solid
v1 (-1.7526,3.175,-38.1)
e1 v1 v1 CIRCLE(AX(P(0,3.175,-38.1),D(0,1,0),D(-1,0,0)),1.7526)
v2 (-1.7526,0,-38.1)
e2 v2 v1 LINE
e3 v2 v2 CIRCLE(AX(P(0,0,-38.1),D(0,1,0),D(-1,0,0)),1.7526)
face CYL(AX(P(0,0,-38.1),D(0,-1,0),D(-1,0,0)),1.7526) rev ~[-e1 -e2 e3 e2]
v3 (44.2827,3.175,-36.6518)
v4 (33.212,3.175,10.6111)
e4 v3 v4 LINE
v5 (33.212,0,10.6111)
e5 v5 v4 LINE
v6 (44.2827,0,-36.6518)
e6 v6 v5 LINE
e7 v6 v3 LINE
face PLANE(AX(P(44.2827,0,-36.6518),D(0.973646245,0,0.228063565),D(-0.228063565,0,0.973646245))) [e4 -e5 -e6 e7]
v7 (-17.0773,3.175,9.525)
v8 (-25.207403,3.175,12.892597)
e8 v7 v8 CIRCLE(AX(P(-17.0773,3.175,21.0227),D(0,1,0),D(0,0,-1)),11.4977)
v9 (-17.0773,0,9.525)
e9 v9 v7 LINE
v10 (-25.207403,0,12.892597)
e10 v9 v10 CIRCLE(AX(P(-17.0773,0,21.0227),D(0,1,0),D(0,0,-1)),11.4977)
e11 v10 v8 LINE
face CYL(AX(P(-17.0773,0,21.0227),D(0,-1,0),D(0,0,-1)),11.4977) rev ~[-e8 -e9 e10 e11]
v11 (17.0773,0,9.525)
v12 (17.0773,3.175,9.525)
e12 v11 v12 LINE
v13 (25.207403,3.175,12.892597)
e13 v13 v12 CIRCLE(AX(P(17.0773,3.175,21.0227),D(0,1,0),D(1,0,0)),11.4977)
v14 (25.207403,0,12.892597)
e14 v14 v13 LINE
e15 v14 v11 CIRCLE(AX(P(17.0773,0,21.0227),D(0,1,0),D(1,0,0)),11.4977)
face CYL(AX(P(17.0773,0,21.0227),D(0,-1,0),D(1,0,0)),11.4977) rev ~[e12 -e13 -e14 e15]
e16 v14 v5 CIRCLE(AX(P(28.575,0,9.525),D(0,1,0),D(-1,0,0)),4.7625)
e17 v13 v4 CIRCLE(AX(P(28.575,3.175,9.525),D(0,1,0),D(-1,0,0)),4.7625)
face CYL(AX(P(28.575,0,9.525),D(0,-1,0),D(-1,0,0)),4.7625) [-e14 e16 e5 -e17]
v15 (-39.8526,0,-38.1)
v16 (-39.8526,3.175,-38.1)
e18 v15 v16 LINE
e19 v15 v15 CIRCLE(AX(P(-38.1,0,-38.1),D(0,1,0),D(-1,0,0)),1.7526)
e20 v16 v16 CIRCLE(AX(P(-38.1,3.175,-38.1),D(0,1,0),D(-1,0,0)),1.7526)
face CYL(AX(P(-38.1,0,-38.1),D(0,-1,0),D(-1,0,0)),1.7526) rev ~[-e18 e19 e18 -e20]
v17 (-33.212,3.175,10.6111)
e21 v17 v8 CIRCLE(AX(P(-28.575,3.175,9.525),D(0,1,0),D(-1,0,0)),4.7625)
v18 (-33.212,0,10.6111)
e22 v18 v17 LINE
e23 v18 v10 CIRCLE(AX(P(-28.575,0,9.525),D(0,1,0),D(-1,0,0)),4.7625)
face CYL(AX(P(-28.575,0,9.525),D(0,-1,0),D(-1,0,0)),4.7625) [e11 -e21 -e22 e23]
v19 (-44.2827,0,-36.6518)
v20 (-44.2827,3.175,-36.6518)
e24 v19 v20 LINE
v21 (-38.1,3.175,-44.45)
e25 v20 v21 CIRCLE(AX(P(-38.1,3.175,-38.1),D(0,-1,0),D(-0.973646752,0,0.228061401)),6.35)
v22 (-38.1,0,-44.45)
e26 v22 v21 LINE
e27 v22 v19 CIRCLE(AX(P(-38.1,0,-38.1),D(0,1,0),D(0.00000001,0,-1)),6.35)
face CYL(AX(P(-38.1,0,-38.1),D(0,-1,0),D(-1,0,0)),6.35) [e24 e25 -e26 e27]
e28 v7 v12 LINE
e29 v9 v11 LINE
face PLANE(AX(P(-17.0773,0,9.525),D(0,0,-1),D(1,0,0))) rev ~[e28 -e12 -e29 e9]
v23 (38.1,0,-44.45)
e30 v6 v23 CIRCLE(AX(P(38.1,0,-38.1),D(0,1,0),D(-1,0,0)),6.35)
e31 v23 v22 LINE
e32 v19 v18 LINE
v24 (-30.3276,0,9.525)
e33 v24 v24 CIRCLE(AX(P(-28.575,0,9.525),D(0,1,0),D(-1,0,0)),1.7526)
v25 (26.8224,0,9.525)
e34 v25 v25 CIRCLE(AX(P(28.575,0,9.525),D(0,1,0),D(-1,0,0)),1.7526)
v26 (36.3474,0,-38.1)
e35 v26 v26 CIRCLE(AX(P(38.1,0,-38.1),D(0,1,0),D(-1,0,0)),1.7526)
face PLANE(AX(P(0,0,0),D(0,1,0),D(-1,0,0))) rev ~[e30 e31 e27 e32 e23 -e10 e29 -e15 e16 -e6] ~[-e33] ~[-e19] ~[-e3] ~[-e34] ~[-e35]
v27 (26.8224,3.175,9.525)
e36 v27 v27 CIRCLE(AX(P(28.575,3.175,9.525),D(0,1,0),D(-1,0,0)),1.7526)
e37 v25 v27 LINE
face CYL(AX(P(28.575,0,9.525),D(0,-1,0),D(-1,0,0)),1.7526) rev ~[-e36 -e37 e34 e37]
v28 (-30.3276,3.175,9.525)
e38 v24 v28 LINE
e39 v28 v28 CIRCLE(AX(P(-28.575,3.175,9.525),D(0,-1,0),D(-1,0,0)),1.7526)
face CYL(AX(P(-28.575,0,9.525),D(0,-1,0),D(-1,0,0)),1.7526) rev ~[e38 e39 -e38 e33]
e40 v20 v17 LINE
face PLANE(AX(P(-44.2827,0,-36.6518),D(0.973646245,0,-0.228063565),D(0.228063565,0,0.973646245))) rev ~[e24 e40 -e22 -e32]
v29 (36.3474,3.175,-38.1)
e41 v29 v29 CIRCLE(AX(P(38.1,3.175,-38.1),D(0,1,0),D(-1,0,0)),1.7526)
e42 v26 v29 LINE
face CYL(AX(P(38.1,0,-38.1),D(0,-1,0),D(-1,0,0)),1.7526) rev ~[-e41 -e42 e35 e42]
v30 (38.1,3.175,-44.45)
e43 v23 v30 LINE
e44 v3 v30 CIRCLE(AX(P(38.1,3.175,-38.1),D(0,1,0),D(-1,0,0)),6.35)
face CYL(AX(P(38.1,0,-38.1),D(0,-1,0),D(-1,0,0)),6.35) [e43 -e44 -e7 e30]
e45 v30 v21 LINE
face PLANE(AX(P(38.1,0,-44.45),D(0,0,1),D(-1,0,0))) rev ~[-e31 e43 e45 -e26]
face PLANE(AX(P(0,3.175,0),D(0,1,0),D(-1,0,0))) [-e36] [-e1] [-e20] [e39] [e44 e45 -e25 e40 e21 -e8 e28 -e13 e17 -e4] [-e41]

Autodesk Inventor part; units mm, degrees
ref_plane "YZ Plane" through (0, 0, 0) normal (1, 0, 0) x (0, 1, 0)
ref_plane "XZ Plane" through (0, 0, 0) normal (0, 1, 0) x (-1, 0, 0)
ref_plane "XY Plane" through (0, 0, 0) normal (0, 0, 1) x (1, 0, 0)
sketch "Sketch1" plane through (0, 0, 0) normal (0, 1, 0) x (-1, 0, 0)
  line L0 (101.6, 38.1) -> (-101.6, 38.1) construction
  line L1 (-101.6, 38.1) -> (-101.6, -38.1) construction
  line L2 (-101.6, -38.1) -> (101.6, -38.1) construction
  line L3 (101.6, -38.1) -> (101.6, 38.1) construction
  line L4 (101.6, 38.1) -> (-101.6, -38.1) construction
  line L5 (-101.6, 38.1) -> (101.6, -38.1) construction
  line L6 (-28.575, 66.675) -> (28.575, 66.675) construction
  line L7 (28.575, 66.675) -> (28.575, 9.525) construction
  line L8 (28.575, 9.525) -> (-28.575, 9.525)
  line L9 (-28.575, 9.525) -> (-28.575, 66.675) construction
  line L10 (-28.575, 66.675) -> (28.575, 9.525) construction
  line L11 (28.575, 66.675) -> (-28.575, 9.525) construction
  circle A0 centre (-38.1, 50.8) radius 3.175 construction
  line L12 (0, 38.1) -> (0, -38.1) construction
  circle A1 centre (-38.1, 50.8) radius 9.525 construction
  line L13 (-38.1, 60.325) -> (-28.575, 60.325) construction
  circle A2 centre (38.1, 50.8) radius 3.175 construction
  circle A3 centre (38.1, 50.8) radius 9.525 construction
  line L14 (38.1, 60.325) -> (28.575, 60.325) construction
  circle A4 centre (-76.2, -38.1) radius 1.7526 construction
  circle A5 centre (-95.25, 3.175) radius 1.7526 construction
  circle A6 centre (76.2, -38.1) radius 1.7526 construction
  circle A7 centre (95.25, 3.175) radius 1.7526 construction
  line L15 (-101.6, -38.1) -> (-101.6, 6.35) construction
  line L16 (-101.6, 6.35) -> (-44.4797, 57.8728) construction
  line L17 (101.6, -38.1) -> (101.6, 6.35) construction
  line L18 (101.6, 6.35) -> (44.4797, 57.8728) construction
  line L19 (-42.6417, 42.4275) -> (-87.975, 1.5367) construction
  line L20 (-87.975, 1.5367) -> (-87.975, -38.1) construction
  line L21 (87.975, -38.1) -> (87.975, 1.5367) construction
  line L22 (87.975, 1.5367) -> (42.6417, 42.4275) construction
  line L23 (0, -38.1) -> (-95.25, -38.1) construction
  line L24 (0, -38.1) -> (95.25, -38.1) construction
  circle A8 centre (-60.325, 35.0287) radius 1.7526 construction
  circle A9 centre (-33.3375, 31.75) radius 1.7526 construction
  line L25 (-38.1, 0) -> (-38.1, 41.275) construction
  line L26 (-38.1, 0) -> (0, 0) construction
  circle A10 centre (60.325, 35.0287) radius 1.7526 construction
  circle A11 centre (33.3375, 31.75) radius 1.7526 construction
  line L27 (38.1, 0) -> (38.1, 41.275) construction
  line L28 (38.1, 0) -> (0, 0) construction
  line L29 (-87.975, 0) -> (-65.115, 0) construction
  line L30 (-65.115, 0) -> (-65.115, -31.75) construction
  line L31 (-65.115, -31.75) -> (-87.975, -31.75) construction
  line L32 (-101.6, -38.1) -> (101.6, -38.1) construction
  line L33 (101.6, -38.1) -> (101.6, 19.05) construction
  line L34 (101.6, 19.05) -> (-101.6, 19.05) construction
  line L35 (-101.6, 19.05) -> (-101.6, -38.1) construction
  line L36 (-101.6, 19.05) -> (-87.5203, 19.05) construction
  line L37 (87.5203, 19.05) -> (101.6, 19.05) construction
  circle A12 centre (-38.1, 0) radius 3.175 construction
  circle A13 centre (-38.1, 0) radius 6.35 construction
  circle A14 centre (38.1, 0) radius 3.175 construction
  circle A15 centre (38.1, 0) radius 6.35 construction
  circle A16 centre (28.575, 9.525) radius 1.7526
  circle A17 centre (28.575, 9.525) radius 4.7625
  arc A18 (17.0773, 9.525) -> (28.575, 21.0227) centre (17.0773, 21.0227) ccw
  circle A19 centre (-28.575, 9.525) radius 1.7526
  circle A20 centre (-28.575, 9.525) radius 4.7625
  arc A21 (-28.575, 21.0227) -> (-17.0773, 9.525) centre (-17.0773, 21.0227) ccw
  arc A22 (31.4325, 5.715) -> (38.1, 19.05) centre (21.4312, 19.05) ccw construction
  arc A23 (-38.1, 19.05) -> (-31.4325, 5.715) centre (-21.4312, 19.05) ccw construction
  line L38 (-61.94, -38.1) -> (-61.94, 25.0204) construction
  line L39 (87.975, 0) -> (65.115, 0) construction
  line L40 (65.115, 0) -> (65.115, -31.75) construction
  line L41 (65.115, -31.75) -> (87.975, -31.75) construction
  line L42 (61.94, -38.1) -> (61.94, 25.0204) construction
  line L43 (-28.575, 4.7625) -> (28.575, 4.7625) construction
  line L44 (101.6, -31.75) -> (-101.6, -31.75) construction
  line L45 (-101.6, -31.75) -> (-101.6, -44.45) construction
  line L46 (-101.6, -44.45) -> (101.6, -44.45)
  line L47 (101.6, -44.45) -> (101.6, -31.75) construction
  circle A24 centre (0, -38.1) radius 1.7526
  circle A25 centre (38.1, -38.1) radius 1.7526
  circle A26 centre (-38.1, -38.1) radius 1.7526
  line L48 (101.6, -38.1) -> (76.2, -44.45) construction
  line L49 (-101.6, -38.1) -> (-76.2, -44.45) construction
  line L50 (76.2, -38.1) -> (76.2, -44.45) construction
  line L51 (-76.2, -38.1) -> (-76.2, -44.45) construction
  line L52 (59.1924, 41.2769) -> (32.488, 36.4361) construction
  circle A27 centre (60.325, 35.0287) radius 6.35 construction
  circle A28 centre (33.3375, 31.75) radius 4.7625 construction
  line L53 (-59.1924, 41.2769) -> (-32.488, 36.4361) construction
  circle A29 centre (-60.325, 35.0287) radius 6.35 construction
  circle A30 centre (-33.3375, 31.75) radius 4.7625 construction
  line L54 (-87.975, 0) -> (-65.115, 0) construction
  line L55 (-65.115, 0) -> (-65.115, -3.175) construction
  line L56 (-65.115, -3.175) -> (-87.975, -3.175) construction
  line L57 (-87.975, -3.175) -> (-87.975, 0) construction
  line L58 (-65.115, -15.875) -> (-87.975, -15.875) construction
  line L59 (-65.115, -28.575) -> (-87.975, -28.575) construction
  line L60 (-84.8, -38.1) -> (-84.8, 0.1248) construction
  line L61 (65.115, -3.175) -> (87.975, -3.175) construction
  line L62 (65.115, -15.875) -> (87.975, -15.875) construction
  line L63 (65.115, -28.575) -> (87.975, -28.575) construction
  line L64 (84.8, -38.1) -> (84.8, 0.1248) construction
  line L65 (-31.75, -31.75) -> (31.75, -31.75) construction
  line L66 (31.75, -31.75) -> (31.75, 0) construction
  line L67 (31.75, 0) -> (-31.75, 0) construction
  line L68 (-31.75, 0) -> (-31.75, -31.75) construction
  circle A31 centre (71.465, 12.7) radius 3.175 construction
  circle A32 centre (-71.465, 12.7) radius 3.175 construction
  circle A33 centre (38.1, -38.1) radius 6.35
  circle A34 centre (-38.1, -38.1) radius 6.35
  line L69 (44.2827, -36.6518) -> (33.212, 10.6111)
  line L70 (-44.2827, -36.6518) -> (-33.212, 10.6111)
  point P0 (28.575, 38.1)
  point P1 (-28.575, 38.1)
  point P2 (28.575, 60.325)
  point P3 (44.4797, 57.8728)
  point P4 (101.6, -15.875)
  point P5 (38.1, 41.275)
  point P6 (-87.975, -31.75)
  point P7 (-101.6, 6.35)
  point P8 (101.6, 6.35)
  point P9 (31.75, 0)
  point P10 (38.1, 6.35)
  point P11 (-38.1, 6.35)
  point P12 (-31.75, 0)
  point P13 (87.975, 0)
  point P14 (61.94, 25.0204)
  point P15 (-17.0773, 9.525)
  point P16 (-28.575, 21.0227)
  point P17 (-38.1, 19.05)
  point P18 (-31.4325, 5.715)
  point P19 (-21.8502, 0)
  point P20 (21.8502, 0)
  point P21 (-25.2074, 12.8926)
  point P22 (-28.575, 14.2875)
  point P23 (-23.8125, 9.525)
  point P24 (-28.575, 50.8)
  point P25 (25.2074, 12.8926)
  point P26 (28.575, 14.2875)
  point P27 (23.8125, 9.525)
  point P28 (28.575, 50.8)
  point P29 (26.8224, 9.525)
  point P30 (28.575, 11.2776)
  point P31 (61.94, -31.75)
  point P32 (-61.94, -31.75)
  point P33 (-28.575, 31.75)
  point P34 (-64.5781, 39.7439)
  point P35 (64.5781, 39.7439)
  point P36 (28.575, 31.75)
  point P37 (-84.8, -3.175)
  point P38 (-84.8, -28.575)
  point P39 (84.8, -3.175)
  point P40 (84.8, -28.575)
  point P41 (31.75, -31.75)
  point P42 (-101.6, -31.75)
  point P43 (31.75, -31.75)
  point P44 (-26.8224, 9.525)
  point P45 (-28.575, 11.2776)
  point P46 (-39.8526, -38.1)
  point P47 (-36.3474, -38.1)
  point P48 (-1.7526, -38.1)
  point P49 (1.7526, -38.1)
  point P50 (36.3474, -38.1)
  point P51 (39.8526, -38.1)
  point P52 (-38.1, -44.45)
  point P53 (38.1, -44.45)
  dimension "d0" = 203.2
  dimension "d1" = 76.2
  dimension "d4" = 57.15
  dimension "d6" = 6.35
  dimension "d7" = 38.1
  dimension "d8" = 19.05
  dimension "d10" = 3.5052
  dimension "d11" = 3.5052
  dimension "d12" = 0
  dimension "d14" = 25.4
  dimension "d15" = 6.35
  dimension "d20" = 50.8
  dimension "d21" = 41.275
  dimension "d22" = 44.45
  dimension "d24" = 12.7
  dimension "d25" = 13.625
  dimension "d26" = 12.7
  dimension "d27" = 13.625
  dimension "d31" = 3.5052
  dimension "d32" = 3.5052
  dimension "d33" = 6.35
  dimension "d34" = 31.75
  dimension "d35" = 4.7625
  dimension "d36" = 22.225
  dimension "d37" = 9.525
  dimension "d39" = 31.75
  dimension "d40" = 6.35
  dimension "d42" = 57.15
  dimension "d43" = 6.35
  dimension "d44" = 9.525
  dimension "d45" = 9.525
  dimension "d46" = 12.7
  dimension "d104" = 3.5052
  dimension "d105" = 9.525
  dimension "d106" = 3.175
  dimension "d107" = 22.86
  dimension "d123" = 88.9
  dimension "d124" = 12.7
  dimension "d125" = 3.5052
  dimension "d126" = 3.5052
  dimension "d127" = 38.1
  dimension "d128" = 28.575
  dimension "d129" = 3.175
  dimension "d130" = 3.175
  dimension "d131" = 31.75
  dimension "d132" = 31.75
  dimension "d133" = 31.75
  dimension "d135" = 6.35
  dimension "d136" = 12.7
  dimension "d137" = 9.525
extrude "Extrusion1" add sketch "Sketch1" along normal blind 3.175
equation "\"d35\" = 0.5 * d37"
properties part number "Chassis" material "UHMW, White"
